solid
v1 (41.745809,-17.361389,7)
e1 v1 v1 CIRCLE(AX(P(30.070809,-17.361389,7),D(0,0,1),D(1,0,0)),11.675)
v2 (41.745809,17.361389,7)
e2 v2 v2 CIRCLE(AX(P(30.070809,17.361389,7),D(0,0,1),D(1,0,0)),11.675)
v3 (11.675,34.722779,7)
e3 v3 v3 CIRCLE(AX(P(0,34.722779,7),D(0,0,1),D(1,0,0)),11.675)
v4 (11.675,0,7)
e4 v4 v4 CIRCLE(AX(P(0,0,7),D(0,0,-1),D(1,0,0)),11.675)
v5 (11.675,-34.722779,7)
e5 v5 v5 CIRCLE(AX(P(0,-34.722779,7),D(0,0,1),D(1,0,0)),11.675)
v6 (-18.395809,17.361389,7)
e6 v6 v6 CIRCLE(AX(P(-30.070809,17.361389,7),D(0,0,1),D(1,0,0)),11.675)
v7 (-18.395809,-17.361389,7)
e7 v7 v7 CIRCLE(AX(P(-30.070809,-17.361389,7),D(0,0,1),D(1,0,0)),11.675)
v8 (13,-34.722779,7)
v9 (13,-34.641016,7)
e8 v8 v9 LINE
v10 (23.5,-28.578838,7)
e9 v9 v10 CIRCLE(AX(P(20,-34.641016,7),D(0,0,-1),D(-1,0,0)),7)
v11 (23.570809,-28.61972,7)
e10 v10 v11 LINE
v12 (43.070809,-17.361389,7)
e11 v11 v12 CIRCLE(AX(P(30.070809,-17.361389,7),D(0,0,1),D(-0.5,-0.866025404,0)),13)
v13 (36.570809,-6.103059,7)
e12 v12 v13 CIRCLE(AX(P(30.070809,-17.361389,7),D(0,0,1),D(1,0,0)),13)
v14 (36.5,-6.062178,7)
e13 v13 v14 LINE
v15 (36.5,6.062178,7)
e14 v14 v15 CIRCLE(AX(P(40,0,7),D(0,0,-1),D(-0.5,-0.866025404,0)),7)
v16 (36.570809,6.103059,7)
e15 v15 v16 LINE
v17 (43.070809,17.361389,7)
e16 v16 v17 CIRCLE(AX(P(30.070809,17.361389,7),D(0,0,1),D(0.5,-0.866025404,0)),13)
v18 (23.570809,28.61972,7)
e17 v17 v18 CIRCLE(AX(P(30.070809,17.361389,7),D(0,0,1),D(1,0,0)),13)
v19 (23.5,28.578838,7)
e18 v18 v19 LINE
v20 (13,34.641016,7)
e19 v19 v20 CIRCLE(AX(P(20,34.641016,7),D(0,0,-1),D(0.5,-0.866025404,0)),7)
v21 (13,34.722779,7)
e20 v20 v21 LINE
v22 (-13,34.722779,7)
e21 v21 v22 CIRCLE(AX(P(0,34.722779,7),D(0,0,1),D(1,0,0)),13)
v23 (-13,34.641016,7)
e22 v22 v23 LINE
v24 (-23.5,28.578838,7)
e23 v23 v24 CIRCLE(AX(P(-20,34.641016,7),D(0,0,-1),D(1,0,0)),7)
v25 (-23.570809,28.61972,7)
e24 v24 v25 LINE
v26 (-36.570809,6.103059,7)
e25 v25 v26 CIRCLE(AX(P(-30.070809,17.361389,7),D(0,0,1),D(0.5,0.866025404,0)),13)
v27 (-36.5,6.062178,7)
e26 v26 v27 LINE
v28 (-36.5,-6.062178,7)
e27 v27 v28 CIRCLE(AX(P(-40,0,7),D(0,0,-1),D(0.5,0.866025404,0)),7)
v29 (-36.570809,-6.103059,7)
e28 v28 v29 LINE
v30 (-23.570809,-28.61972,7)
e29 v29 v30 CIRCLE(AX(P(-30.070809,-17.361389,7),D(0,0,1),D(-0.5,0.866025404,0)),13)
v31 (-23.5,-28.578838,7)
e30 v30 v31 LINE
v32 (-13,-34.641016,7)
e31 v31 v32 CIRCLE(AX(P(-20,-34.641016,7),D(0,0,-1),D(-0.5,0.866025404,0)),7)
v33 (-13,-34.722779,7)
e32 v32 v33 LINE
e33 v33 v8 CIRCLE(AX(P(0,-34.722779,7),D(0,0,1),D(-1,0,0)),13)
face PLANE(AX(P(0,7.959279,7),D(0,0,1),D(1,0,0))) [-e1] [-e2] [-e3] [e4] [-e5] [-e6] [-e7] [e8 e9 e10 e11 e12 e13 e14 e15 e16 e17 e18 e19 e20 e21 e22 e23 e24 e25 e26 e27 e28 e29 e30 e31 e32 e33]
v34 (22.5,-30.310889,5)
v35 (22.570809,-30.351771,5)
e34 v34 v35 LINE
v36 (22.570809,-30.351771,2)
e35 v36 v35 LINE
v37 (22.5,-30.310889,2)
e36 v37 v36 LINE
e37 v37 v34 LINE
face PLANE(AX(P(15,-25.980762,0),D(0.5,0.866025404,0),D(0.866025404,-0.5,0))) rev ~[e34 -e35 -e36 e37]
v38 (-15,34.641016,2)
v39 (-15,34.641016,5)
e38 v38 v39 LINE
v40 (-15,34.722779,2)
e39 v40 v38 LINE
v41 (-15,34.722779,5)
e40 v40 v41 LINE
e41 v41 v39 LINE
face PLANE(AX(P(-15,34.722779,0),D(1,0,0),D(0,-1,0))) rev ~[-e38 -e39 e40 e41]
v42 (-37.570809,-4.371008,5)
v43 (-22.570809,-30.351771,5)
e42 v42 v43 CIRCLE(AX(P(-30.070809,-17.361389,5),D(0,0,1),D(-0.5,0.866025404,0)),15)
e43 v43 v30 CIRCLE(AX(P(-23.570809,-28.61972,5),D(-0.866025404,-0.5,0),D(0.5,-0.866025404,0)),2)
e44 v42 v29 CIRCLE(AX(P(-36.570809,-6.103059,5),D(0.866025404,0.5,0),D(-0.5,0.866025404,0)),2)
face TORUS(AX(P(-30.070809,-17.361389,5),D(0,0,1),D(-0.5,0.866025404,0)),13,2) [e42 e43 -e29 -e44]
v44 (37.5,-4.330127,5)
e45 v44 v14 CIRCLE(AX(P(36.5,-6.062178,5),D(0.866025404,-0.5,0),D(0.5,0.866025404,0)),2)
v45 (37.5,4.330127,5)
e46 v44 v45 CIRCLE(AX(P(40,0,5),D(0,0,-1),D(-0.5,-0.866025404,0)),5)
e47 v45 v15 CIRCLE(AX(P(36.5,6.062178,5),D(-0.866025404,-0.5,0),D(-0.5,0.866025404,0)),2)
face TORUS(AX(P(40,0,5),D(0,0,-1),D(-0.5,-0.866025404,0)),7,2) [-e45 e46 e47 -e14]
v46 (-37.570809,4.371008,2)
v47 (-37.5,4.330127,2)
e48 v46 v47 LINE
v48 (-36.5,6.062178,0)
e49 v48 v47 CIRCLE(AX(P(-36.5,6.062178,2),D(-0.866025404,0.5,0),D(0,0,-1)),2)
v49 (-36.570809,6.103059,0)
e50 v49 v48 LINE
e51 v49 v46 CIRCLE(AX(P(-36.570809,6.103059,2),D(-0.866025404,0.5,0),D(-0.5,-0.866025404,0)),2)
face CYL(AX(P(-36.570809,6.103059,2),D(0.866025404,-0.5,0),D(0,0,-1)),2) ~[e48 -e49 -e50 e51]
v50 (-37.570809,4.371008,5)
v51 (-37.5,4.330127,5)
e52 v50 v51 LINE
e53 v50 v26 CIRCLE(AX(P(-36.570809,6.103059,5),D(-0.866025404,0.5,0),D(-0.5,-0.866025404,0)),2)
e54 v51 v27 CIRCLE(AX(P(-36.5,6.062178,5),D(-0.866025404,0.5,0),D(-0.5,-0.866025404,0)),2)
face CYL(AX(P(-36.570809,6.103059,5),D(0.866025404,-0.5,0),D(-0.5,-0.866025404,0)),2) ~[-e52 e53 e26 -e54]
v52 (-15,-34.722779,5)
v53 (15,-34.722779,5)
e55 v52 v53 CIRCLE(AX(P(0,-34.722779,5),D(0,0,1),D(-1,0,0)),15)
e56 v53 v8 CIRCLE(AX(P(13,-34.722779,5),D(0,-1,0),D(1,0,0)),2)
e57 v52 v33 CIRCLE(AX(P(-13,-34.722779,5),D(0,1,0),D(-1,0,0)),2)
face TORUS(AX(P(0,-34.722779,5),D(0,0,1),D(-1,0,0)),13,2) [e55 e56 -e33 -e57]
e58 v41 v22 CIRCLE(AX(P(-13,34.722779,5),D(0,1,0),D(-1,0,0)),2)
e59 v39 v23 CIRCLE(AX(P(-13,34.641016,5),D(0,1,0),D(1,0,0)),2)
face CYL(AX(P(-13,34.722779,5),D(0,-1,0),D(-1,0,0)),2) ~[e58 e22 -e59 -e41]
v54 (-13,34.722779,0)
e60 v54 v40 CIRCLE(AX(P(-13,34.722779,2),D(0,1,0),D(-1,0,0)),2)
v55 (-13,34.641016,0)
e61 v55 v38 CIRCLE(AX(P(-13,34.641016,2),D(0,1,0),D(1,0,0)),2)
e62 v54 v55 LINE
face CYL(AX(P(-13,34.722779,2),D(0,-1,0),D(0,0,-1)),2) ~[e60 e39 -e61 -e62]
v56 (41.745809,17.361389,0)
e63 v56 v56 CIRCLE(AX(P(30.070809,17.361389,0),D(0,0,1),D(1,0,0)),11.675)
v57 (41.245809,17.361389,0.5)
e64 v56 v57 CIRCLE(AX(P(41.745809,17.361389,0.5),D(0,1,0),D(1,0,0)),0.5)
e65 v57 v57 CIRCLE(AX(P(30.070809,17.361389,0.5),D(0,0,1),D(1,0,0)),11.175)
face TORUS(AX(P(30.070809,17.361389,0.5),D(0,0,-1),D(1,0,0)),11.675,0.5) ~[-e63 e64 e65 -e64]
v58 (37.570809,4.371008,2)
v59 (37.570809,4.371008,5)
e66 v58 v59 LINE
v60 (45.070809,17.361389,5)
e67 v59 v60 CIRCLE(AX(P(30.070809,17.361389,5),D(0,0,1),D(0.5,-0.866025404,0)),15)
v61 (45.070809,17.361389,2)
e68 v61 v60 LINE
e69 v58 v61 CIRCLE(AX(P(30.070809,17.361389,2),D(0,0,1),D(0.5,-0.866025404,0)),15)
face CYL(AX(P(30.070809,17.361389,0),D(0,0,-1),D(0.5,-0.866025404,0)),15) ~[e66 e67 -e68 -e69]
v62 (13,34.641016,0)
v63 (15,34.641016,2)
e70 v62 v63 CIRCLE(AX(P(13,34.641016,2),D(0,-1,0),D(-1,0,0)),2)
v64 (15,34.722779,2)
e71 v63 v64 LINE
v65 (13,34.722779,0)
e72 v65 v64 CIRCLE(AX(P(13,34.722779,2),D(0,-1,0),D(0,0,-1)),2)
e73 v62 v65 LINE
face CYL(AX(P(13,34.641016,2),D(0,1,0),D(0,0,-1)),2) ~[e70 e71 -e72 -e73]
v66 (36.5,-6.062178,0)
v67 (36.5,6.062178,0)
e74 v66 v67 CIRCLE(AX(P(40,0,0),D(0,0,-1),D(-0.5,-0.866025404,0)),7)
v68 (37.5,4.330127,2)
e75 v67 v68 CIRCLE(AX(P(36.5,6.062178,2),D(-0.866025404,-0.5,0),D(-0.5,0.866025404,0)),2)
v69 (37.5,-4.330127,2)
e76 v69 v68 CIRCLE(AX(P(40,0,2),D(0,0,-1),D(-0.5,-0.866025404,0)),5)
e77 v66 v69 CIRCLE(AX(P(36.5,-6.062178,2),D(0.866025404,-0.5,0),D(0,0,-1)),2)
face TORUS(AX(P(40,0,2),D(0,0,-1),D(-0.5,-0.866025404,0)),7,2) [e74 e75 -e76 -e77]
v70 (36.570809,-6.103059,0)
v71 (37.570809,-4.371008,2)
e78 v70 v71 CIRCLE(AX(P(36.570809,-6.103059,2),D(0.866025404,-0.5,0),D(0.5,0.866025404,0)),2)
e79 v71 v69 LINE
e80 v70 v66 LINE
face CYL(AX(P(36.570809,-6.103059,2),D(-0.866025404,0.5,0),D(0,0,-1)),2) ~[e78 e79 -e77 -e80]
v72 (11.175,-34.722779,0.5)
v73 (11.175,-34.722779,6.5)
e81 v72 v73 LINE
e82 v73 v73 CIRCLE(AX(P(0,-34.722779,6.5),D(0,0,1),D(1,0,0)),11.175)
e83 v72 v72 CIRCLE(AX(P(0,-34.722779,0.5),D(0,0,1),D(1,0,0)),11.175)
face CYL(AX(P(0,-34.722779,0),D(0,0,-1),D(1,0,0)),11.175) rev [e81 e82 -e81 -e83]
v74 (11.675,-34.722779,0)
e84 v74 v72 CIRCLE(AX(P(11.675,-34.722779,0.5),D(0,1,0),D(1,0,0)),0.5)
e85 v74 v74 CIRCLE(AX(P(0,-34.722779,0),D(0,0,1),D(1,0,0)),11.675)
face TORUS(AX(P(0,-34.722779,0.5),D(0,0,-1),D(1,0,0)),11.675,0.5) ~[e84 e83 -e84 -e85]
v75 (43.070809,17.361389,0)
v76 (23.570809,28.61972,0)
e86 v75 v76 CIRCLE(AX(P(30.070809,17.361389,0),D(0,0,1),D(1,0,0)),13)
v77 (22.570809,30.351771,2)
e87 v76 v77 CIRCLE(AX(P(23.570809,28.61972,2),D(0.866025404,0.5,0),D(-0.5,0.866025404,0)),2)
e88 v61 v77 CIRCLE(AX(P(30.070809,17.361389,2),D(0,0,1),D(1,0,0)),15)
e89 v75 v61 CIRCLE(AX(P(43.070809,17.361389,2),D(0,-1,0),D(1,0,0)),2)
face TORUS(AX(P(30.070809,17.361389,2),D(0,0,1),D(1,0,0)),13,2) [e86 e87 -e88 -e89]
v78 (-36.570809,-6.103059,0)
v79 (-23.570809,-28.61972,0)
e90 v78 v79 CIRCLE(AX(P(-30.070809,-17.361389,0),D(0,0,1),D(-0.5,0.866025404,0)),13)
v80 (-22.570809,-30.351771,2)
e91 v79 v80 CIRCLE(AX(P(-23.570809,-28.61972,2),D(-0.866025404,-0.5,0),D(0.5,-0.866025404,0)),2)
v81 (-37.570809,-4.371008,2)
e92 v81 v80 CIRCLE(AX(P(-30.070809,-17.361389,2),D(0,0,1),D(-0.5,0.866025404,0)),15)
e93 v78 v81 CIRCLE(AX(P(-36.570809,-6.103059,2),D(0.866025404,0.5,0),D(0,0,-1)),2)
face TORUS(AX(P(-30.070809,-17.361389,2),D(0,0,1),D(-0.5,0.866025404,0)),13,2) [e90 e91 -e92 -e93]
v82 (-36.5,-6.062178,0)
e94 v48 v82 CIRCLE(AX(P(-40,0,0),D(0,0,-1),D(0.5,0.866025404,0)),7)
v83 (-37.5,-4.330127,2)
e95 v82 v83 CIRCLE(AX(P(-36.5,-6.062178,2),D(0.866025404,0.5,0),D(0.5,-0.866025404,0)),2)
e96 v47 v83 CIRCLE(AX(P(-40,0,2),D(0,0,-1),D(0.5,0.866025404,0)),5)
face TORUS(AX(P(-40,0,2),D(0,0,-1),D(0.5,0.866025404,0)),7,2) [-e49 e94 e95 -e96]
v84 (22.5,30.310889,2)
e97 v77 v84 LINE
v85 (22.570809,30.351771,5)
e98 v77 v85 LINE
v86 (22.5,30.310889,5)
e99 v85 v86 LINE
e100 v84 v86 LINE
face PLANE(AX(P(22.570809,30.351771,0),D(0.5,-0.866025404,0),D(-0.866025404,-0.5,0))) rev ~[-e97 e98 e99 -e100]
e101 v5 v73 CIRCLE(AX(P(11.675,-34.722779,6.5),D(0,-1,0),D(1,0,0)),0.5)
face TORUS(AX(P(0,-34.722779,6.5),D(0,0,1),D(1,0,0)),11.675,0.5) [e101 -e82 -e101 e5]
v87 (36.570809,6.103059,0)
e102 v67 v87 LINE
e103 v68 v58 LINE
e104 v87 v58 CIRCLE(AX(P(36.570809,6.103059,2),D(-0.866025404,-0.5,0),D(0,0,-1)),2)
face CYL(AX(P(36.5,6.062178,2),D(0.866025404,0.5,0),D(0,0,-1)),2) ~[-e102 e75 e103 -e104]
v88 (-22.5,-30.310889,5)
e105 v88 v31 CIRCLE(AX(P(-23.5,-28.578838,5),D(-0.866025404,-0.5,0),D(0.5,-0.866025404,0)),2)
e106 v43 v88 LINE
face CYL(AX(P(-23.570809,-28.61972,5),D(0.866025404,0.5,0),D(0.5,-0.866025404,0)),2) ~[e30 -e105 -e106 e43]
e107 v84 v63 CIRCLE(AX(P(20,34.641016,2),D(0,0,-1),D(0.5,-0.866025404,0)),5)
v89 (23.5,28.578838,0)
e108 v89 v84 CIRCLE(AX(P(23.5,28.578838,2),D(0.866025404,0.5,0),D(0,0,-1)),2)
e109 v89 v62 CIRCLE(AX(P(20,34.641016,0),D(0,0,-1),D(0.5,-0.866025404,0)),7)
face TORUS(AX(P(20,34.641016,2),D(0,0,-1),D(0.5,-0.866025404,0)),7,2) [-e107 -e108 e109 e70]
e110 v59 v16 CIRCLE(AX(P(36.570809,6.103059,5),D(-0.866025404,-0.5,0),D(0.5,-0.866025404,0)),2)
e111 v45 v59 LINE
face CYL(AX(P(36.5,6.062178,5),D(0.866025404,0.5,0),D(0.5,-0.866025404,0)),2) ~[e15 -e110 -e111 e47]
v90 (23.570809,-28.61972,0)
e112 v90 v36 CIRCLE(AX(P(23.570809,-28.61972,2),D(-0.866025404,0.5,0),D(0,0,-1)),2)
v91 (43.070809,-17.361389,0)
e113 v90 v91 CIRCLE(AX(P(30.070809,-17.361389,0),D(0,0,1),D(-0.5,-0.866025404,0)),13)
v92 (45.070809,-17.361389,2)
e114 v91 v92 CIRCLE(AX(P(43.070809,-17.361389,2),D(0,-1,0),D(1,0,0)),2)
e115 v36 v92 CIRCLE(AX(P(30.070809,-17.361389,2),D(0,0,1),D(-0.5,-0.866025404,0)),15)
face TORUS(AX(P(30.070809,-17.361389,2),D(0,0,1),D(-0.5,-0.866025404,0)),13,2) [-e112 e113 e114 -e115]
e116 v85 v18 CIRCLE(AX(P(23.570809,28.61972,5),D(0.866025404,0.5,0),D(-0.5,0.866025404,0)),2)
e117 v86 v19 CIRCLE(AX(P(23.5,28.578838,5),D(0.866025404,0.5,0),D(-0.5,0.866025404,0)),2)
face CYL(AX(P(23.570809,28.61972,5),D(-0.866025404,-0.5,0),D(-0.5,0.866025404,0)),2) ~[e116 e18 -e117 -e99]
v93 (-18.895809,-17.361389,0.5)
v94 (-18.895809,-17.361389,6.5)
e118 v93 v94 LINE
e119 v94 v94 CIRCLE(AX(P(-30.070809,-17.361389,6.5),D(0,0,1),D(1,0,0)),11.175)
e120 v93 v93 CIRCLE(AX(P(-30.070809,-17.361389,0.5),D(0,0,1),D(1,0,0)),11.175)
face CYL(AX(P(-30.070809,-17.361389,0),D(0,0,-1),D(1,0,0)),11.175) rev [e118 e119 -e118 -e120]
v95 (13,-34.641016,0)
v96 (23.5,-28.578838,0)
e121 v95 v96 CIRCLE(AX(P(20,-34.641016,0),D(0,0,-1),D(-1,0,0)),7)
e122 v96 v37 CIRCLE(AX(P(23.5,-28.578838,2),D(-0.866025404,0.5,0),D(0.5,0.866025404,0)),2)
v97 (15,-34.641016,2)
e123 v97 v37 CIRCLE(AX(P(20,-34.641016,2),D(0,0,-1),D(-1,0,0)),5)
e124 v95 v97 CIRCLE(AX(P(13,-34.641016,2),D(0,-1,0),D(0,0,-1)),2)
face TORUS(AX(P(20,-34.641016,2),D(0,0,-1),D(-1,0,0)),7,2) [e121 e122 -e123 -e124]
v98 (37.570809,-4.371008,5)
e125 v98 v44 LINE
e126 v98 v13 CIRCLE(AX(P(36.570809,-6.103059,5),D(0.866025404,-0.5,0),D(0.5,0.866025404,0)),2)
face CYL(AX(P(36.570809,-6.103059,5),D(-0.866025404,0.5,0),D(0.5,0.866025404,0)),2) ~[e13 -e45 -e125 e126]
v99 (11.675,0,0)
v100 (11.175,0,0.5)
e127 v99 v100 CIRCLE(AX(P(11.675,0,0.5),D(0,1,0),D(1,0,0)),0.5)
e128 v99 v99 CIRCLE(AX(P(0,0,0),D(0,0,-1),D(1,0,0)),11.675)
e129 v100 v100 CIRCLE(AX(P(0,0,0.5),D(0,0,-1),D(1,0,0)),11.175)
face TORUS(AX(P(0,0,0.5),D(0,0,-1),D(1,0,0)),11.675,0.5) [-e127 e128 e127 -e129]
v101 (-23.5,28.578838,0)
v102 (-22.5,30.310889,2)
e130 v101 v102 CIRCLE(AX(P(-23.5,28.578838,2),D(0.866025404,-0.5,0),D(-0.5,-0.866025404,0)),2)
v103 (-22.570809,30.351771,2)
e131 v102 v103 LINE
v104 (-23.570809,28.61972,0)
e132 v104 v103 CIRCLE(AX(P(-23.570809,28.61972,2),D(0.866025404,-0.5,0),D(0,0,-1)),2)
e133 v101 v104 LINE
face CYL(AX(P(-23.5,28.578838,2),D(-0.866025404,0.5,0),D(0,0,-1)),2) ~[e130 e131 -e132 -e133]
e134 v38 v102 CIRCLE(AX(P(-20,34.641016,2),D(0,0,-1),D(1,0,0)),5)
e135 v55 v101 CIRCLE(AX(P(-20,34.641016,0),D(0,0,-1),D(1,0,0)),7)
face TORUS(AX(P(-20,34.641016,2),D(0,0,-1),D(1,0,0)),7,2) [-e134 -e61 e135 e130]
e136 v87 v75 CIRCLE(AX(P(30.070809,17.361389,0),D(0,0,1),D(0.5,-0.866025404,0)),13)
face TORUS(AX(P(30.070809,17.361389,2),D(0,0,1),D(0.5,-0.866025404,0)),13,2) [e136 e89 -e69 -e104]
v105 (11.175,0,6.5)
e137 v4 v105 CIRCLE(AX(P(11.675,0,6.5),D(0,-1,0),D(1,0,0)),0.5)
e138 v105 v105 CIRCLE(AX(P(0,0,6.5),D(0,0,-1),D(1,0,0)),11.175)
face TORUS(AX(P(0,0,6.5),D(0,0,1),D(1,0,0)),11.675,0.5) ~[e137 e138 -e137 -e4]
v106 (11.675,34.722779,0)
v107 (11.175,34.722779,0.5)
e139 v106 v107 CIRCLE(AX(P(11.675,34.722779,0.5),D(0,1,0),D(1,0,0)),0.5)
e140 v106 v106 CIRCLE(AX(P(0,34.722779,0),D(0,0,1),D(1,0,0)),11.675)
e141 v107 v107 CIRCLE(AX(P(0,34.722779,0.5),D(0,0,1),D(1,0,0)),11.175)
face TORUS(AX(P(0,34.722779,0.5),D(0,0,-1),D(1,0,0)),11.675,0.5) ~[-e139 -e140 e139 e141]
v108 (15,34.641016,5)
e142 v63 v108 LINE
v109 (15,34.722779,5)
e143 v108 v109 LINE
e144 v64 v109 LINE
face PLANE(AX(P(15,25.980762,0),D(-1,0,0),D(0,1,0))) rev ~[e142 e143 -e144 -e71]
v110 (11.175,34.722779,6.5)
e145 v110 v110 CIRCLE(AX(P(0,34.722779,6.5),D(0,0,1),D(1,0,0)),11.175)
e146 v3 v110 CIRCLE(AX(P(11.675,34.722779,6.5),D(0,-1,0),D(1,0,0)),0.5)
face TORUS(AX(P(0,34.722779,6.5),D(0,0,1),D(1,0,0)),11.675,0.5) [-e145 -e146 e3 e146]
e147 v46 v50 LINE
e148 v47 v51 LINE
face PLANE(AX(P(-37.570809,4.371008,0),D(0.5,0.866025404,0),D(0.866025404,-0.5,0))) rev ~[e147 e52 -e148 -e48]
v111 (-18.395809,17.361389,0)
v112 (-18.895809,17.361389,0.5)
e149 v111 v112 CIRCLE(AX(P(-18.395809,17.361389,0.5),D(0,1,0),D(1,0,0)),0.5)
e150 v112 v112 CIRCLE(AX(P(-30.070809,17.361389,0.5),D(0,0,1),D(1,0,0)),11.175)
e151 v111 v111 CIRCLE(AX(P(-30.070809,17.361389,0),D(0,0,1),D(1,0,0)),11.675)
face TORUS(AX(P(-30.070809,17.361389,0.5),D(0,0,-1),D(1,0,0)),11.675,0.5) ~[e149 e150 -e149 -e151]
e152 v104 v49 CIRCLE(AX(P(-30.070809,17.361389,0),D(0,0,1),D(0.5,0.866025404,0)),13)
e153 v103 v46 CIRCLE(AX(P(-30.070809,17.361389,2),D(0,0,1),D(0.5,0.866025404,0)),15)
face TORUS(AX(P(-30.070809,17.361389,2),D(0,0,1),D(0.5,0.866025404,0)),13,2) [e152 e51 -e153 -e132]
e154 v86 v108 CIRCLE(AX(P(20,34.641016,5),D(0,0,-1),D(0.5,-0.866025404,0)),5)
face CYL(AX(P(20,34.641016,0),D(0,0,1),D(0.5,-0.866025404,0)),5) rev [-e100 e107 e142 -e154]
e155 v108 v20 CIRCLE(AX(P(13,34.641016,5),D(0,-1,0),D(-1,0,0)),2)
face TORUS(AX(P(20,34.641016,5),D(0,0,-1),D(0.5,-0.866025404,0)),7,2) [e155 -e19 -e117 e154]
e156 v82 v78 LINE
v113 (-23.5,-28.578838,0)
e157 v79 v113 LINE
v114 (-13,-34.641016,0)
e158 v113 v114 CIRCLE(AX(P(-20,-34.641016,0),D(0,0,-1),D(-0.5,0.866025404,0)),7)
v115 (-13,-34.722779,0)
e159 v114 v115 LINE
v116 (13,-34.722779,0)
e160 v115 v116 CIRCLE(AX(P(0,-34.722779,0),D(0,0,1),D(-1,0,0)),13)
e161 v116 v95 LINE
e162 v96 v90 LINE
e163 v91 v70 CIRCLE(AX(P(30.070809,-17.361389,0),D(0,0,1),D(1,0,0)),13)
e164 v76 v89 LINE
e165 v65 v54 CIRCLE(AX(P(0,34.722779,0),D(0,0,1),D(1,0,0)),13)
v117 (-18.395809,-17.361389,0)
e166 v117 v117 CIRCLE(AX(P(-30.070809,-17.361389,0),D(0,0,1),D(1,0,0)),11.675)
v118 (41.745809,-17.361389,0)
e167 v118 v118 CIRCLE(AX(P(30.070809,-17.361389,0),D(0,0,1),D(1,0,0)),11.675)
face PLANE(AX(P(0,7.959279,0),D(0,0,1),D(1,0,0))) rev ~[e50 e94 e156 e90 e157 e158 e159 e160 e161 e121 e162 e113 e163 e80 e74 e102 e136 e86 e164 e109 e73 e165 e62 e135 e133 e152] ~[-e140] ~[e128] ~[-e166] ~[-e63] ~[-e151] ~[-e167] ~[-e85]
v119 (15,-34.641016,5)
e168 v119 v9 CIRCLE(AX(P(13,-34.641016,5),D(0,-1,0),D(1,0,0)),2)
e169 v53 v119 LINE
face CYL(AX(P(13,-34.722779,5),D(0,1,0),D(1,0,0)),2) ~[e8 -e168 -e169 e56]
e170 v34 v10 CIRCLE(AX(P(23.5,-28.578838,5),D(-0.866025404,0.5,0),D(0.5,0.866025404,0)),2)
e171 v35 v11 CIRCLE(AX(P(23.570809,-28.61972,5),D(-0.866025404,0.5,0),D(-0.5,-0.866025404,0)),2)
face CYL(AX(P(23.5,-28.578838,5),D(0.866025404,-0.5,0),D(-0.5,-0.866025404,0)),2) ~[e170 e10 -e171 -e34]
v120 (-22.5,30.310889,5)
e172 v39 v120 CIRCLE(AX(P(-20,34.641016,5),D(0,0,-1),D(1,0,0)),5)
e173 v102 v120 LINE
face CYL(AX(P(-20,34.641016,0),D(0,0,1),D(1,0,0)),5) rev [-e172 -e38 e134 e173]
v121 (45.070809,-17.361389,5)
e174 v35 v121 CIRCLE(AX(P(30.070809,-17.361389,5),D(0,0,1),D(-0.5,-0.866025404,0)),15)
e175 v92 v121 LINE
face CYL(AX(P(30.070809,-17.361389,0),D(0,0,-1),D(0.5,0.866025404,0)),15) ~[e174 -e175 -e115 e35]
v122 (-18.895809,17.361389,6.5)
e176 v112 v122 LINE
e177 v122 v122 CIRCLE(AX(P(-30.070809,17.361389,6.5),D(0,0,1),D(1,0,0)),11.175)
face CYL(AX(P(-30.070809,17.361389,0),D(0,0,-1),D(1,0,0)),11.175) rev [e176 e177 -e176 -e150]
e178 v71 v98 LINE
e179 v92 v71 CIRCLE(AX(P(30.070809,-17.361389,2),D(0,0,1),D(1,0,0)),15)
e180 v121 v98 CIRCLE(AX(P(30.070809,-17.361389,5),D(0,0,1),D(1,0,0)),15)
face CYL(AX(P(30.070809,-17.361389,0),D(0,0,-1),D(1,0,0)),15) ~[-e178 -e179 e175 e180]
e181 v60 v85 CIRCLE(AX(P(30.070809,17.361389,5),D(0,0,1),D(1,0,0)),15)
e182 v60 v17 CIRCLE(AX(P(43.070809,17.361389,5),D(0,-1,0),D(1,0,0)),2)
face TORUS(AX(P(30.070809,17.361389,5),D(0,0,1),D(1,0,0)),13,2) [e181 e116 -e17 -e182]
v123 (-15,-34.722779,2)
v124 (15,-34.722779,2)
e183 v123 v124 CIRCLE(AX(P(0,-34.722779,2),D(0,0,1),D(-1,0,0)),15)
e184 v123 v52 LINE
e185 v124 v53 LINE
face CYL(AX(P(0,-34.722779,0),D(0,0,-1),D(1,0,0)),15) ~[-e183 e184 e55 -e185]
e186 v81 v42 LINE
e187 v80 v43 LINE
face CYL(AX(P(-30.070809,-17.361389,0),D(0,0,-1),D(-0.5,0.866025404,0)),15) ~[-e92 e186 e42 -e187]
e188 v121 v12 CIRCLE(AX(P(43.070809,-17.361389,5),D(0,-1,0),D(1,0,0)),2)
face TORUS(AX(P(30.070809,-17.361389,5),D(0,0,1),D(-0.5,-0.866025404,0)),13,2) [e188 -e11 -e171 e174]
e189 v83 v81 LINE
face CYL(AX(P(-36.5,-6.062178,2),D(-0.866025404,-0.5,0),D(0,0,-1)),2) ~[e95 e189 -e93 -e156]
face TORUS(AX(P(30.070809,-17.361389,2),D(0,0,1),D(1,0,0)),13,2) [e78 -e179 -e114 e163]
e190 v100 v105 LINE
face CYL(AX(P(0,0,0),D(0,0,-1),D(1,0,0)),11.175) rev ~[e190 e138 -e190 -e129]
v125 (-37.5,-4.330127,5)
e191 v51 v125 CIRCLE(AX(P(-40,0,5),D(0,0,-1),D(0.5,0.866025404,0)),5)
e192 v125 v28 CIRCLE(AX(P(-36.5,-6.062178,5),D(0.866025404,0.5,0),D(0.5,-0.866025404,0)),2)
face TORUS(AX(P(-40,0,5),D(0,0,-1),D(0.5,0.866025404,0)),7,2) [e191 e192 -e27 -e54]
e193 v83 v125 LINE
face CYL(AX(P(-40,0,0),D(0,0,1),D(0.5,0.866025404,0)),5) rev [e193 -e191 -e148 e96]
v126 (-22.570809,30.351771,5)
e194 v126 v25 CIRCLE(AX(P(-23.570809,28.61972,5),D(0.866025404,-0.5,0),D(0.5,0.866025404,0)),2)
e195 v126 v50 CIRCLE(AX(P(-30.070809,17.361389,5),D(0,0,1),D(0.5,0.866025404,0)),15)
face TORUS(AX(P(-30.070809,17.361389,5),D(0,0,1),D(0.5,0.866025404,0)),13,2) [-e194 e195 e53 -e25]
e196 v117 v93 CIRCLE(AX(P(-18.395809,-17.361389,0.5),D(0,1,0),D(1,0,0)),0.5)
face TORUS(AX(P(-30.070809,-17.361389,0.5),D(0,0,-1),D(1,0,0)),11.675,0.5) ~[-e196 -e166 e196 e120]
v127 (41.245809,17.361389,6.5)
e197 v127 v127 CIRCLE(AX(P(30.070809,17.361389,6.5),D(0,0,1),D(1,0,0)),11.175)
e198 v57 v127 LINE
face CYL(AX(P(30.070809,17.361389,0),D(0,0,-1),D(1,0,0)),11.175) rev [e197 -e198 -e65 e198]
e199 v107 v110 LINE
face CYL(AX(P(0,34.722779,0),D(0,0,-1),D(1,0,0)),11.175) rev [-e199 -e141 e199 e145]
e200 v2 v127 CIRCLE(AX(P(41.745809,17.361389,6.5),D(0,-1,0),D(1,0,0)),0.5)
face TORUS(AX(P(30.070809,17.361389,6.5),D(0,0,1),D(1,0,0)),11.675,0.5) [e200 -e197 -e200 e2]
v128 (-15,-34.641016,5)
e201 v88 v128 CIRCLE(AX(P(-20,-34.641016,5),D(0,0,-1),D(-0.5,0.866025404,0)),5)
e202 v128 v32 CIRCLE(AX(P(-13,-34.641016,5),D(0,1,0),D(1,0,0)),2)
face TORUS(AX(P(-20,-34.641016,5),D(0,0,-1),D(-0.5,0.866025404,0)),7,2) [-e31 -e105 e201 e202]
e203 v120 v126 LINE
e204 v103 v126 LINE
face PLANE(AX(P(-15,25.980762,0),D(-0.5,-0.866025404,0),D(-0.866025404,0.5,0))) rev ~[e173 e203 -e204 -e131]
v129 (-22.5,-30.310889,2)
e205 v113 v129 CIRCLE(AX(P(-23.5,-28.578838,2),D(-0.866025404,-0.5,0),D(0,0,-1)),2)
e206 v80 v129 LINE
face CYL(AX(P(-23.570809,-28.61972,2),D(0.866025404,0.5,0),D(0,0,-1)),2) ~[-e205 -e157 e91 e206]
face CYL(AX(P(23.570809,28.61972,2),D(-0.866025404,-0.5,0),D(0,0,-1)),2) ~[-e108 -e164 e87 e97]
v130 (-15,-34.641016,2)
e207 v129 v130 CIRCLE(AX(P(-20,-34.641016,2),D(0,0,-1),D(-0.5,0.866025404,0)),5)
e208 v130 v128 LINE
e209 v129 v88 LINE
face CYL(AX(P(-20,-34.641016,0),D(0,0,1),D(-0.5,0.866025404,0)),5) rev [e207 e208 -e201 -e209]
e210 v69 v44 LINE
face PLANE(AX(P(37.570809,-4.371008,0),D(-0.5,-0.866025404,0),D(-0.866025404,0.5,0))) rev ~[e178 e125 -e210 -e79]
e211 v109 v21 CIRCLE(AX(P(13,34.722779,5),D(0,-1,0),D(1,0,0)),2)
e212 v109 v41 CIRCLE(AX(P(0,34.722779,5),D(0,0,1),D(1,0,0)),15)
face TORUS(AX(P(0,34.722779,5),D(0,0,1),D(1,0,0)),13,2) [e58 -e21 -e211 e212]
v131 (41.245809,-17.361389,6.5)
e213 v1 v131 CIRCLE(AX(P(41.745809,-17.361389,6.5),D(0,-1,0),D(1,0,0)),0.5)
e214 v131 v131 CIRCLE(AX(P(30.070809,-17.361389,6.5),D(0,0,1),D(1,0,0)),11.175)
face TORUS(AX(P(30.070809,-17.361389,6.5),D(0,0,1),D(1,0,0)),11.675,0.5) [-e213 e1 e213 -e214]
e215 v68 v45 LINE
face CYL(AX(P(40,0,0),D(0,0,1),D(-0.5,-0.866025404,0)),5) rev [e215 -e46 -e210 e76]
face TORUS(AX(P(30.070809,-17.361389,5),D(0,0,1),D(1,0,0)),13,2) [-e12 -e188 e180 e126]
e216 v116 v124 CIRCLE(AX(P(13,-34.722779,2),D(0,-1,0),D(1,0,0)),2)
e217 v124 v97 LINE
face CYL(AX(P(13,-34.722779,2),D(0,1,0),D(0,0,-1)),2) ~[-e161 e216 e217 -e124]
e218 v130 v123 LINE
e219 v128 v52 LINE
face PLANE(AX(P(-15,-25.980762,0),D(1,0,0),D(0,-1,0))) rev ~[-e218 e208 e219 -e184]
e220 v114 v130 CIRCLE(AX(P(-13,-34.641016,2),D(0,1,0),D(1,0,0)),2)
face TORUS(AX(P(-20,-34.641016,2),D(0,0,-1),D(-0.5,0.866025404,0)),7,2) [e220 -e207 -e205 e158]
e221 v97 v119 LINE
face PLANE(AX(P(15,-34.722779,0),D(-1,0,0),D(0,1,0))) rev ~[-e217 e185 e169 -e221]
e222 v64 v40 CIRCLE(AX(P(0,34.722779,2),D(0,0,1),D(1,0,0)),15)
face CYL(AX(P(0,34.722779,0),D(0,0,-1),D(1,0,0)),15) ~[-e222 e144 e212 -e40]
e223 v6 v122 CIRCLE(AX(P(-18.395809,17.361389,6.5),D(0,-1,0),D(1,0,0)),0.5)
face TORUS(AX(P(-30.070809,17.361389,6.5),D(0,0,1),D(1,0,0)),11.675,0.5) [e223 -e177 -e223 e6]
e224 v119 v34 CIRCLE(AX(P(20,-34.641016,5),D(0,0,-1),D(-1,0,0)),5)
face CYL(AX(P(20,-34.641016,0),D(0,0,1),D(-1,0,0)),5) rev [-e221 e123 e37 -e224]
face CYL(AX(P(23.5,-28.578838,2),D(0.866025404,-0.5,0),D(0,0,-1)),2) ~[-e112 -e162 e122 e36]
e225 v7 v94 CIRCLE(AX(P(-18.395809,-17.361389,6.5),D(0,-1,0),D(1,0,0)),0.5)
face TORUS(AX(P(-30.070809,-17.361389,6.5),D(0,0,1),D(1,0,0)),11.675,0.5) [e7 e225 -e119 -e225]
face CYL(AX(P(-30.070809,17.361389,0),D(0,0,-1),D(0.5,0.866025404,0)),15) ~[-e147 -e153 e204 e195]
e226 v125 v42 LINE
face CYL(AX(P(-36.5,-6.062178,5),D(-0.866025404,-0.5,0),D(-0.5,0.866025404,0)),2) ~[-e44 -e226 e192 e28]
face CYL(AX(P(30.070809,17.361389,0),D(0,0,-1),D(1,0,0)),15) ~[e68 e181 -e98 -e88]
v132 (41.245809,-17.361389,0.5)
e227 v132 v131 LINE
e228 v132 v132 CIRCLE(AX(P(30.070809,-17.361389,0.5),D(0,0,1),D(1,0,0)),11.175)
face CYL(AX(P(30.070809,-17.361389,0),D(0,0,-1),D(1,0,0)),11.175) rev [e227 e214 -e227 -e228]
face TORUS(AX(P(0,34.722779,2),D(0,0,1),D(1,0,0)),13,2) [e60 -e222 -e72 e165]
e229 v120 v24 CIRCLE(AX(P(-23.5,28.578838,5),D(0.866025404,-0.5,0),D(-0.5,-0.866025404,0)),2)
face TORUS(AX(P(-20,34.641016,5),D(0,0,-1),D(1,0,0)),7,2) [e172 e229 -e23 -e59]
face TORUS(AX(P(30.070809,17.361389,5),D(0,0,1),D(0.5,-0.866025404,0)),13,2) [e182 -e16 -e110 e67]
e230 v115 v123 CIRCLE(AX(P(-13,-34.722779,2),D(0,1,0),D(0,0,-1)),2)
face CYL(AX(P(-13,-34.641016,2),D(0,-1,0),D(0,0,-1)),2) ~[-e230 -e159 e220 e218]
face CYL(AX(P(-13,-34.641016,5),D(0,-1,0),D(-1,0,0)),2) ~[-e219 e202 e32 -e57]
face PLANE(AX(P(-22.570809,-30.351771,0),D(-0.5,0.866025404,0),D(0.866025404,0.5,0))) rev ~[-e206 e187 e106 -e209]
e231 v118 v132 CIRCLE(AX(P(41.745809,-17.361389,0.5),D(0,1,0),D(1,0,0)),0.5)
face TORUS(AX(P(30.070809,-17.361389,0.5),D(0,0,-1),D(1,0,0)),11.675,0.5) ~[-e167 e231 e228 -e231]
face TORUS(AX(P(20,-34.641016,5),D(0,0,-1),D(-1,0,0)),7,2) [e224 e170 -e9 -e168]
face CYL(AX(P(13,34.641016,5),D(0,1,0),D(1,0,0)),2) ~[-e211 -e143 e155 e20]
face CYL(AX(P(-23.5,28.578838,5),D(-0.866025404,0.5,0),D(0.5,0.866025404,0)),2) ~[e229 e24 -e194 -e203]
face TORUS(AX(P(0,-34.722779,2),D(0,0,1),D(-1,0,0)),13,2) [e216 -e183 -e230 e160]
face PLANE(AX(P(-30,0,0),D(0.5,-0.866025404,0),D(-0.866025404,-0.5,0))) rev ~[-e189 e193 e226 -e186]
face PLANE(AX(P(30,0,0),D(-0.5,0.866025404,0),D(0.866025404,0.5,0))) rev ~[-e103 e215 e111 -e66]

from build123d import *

# Parameters (mm, degrees)
F0_R     = 11.175
F1_DEPTH = 7
F2_R     = 5
F3_R     = 0.5
F4_R     = 2


# Not quite as in the source:
# - a feature names something its author has since deleted; it is built from what else it names


with BuildPart() as f1:
    # F0 (on Top) → F1 (new body)
    with BuildSketch(Plane.XY):
        with BuildLine():
            Line((15, 0), (15, 8.6602540378))
            Line((15, 8.6602540378), (7.5, 12.9903810568))
            Line((7.5, 12.9903810568), (0, 17.3205080757))
            Line((0, 17.3205080757), (-7.5, 12.9903810568))
            Line((-7.5, 12.9903810568), (-15, 8.6602540378))
            Line((-15, 8.6602540378), (-15, 0))
            Line((-15, 0), (-11.175, 0))
            ThreePointArc((-11.175, 0), (0, 11.175), (11.175, 0))
            Line((11.175, 0), (15, 0))
        make_face()
        with BuildLine():
            Line((15, 25.9807621135), (15, 34.7227789462))
            ThreePointArc((15, 34.7227789462), (0, 19.7227789462), (-15, 34.7227789462))
            Line((-15, 34.7227789462), (-15, 25.9807621135))
            Line((-15, 25.9807621135), (0, 17.3205080757))
            Line((0, 17.3205080757), (15, 25.9807621135))
        make_face()
        with BuildLine():
            ThreePointArc((-15, 34.7227789462), (0, 19.7227789462), (15, 34.7227789462))
            ThreePointArc((15, 34.7227789462), (0, 49.7227789462), (-15, 34.7227789462))
        make_face()
        with Locations((0, 34.7227789462)):
            Circle(F0_R, mode=Mode.SUBTRACT)
        with BuildLine():
            ThreePointArc((-15.0708086574, 17.3613894731), (-17.0804276006, 24.8613894731), (-22.5708086574, 30.3517705298))
            ThreePointArc((-22.5708086574, 30.3517705298), (-43.0611897141, 24.8613894731), (-37.5708086574, 4.3710084163))
            ThreePointArc((-37.5708086574, 4.3710084163), (-22.5708086574, 4.3710084163), (-15.0708086574, 17.3613894731))
        make_face()
        with Locations((-30.0708086574, 17.3613894731)):
            Circle(F0_R, mode=Mode.SUBTRACT)
        with BuildLine():
            ThreePointArc((-15, -34.7227789462), (0, -49.7227789462), (15, -34.7227789462))
            ThreePointArc((15, -34.7227789462), (0, -19.7227789462), (-15, -34.7227789462))
        make_face()
        with Locations((0, -34.7227789462)):
            Circle(F0_R, mode=Mode.SUBTRACT)
        with BuildLine():
            Line((15, -34.7227789462), (15, -25.9807621135))
            Line((15, -25.9807621135), (0, -17.3205080757))
            Line((0, -17.3205080757), (-15, -25.9807621135))
            Line((-15, -25.9807621135), (-15, -34.7227789462))
            ThreePointArc((-15, -34.7227789462), (0, -19.7227789462), (15, -34.7227789462))
        make_face()
        Polygon((30, 0), (15, 8.6602540378), (15, 0), (15, -8.6602540378), align=None)
        with BuildLine():
            ThreePointArc((-15.0708086574, -17.3613894731), (-22.5708086574, -4.3710084163), (-37.5708086574, -4.3710084163))
            ThreePointArc((-37.5708086574, -4.3710084163), (-43.0611897141, -24.8613894731), (-22.5708086574, -30.3517705298))
            ThreePointArc((-22.5708086574, -30.3517705298), (-17.0804276006, -24.8613894731), (-15.0708086574, -17.3613894731))
        make_face()
        with Locations((-30.0708086574, -17.3613894731)):
            Circle(F0_R, mode=Mode.SUBTRACT)
        with BuildLine():
            Line((-15, -8.6602540378), (-30, 0))
            Line((-30, 0), (-37.5708086574, -4.3710084163))
            ThreePointArc((-37.5708086574, -4.3710084163), (-22.5708086574, -4.3710084163), (-15.0708086574, -17.3613894731))
            ThreePointArc((-15.0708086574, -17.3613894731), (-17.0804276006, -24.8613894731), (-22.5708086574, -30.3517705298))
            Line((-22.5708086574, -30.3517705298), (-15, -25.9807621135))
            Line((-15, -25.9807621135), (-15, -8.6602540378))
        make_face()
        Polygon((-15, 0), (-15, 8.6602540378), (-30, 0), (-15, -8.6602540378), align=None)
        with BuildLine():
            Line((-15, 8.6602540378), (-15, 25.9807621135))
            Line((-15, 25.9807621135), (-22.5708086574, 30.3517705298))
            ThreePointArc((-22.5708086574, 30.3517705298), (-17.0804276006, 24.8613894731), (-15.0708086574, 17.3613894731))
            ThreePointArc((-15.0708086574, 17.3613894731), (-22.5708086574, 4.3710084163), (-37.5708086574, 4.3710084163))
            Line((-37.5708086574, 4.3710084163), (-30, 0))
            Line((-30, 0), (-15, 8.6602540378))
        make_face()
        Polygon((0, 17.3205080757), (-15, 25.9807621135), (-15, 8.6602540378), (-7.5, 12.9903810568), align=None)
        with BuildLine():
            Line((15, -8.6602540378), (15, 0))
            Line((15, 0), (11.175, 0))
            ThreePointArc((11.175, 0), (0, -11.175), (-11.175, 0))
            Line((-11.175, 0), (-15, 0))
            Line((-15, 0), (-15, -8.6602540378))
            Line((-15, -8.6602540378), (-7.5, -12.9903810568))
            Line((-7.5, -12.9903810568), (0, -17.3205080757))
            Line((0, -17.3205080757), (7.5, -12.9903810568))
            Line((7.5, -12.9903810568), (15, -8.6602540378))
        make_face()
        Polygon((15, 8.6602540378), (15, 25.9807621135), (0, 17.3205080757), (7.5, 12.9903810568), align=None)
        with BuildLine():
            Line((22.5708086574, 30.3517705298), (15, 25.9807621135))
            Line((15, 25.9807621135), (15, 8.6602540378))
            Line((15, 8.6602540378), (30, 0))
            Line((30, 0), (37.5708086574, 4.3710084163))
            ThreePointArc((37.5708086574, 4.3710084163), (17.0804276006, 9.8613894731), (22.5708086574, 30.3517705298))
        make_face()
        with BuildLine():
            ThreePointArc((45.0708086574, 17.3613894731), (37.5708086574, 30.3517705298), (22.5708086574, 30.3517705298))
            ThreePointArc((22.5708086574, 30.3517705298), (17.0804276006, 9.8613894731), (37.5708086574, 4.3710084163))
            ThreePointArc((37.5708086574, 4.3710084163), (43.0611897141, 9.8613894731), (45.0708086574, 17.3613894731))
        make_face()
        with Locations((30.0708086574, 17.3613894731)):
            Circle(F0_R, mode=Mode.SUBTRACT)
        with BuildLine():
            ThreePointArc((45.0708086574, -17.3613894731), (43.0611897141, -9.8613894731), (37.5708086574, -4.3710084163))
            ThreePointArc((37.5708086574, -4.3710084163), (17.0804276006, -9.8613894731), (22.5708086574, -30.3517705298))
            ThreePointArc((22.5708086574, -30.3517705298), (37.5708086574, -30.3517705298), (45.0708086574, -17.3613894731))
        make_face()
        with Locations((30.0708086574, -17.3613894731)):
            Circle(F0_R, mode=Mode.SUBTRACT)
        Polygon((15, -25.9807621135), (15, -8.6602540378), (7.5, -12.9903810568), (0, -17.3205080757), align=None)
        Polygon((-7.5, -12.9903810568), (-15, -8.6602540378), (-15, -25.9807621135), (0, -17.3205080757), align=None)
        with BuildLine():
            Line((37.5708086574, -4.3710084163), (30, 0))
            Line((30, 0), (15, -8.6602540378))
            Line((15, -8.6602540378), (15, -25.9807621135))
            Line((15, -25.9807621135), (22.5708086574, -30.3517705298))
            ThreePointArc((22.5708086574, -30.3517705298), (17.0804276006, -9.8613894731), (37.5708086574, -4.3710084163))
        make_face()
    extrude(amount=F1_DEPTH)

    # F2
    f2_edges = [f1.edges().sort_by_distance(p)[0] for p in [
        (-15, -25.980762, 3.5),
        (-30, 0, 3.5),
        (30, 0, 3.5),
        (15, -25.980762, 3.5),
        (15, 25.980762, 3.5),
        (-15, 25.980762, 3.5),
    ]]
    fillet(f2_edges, radius=F2_R)

    # F3
    f3_edges = [f1.edges().sort_by_distance(p)[0] for p in [
        (-11.175, 34.722779, 7),
        (-11.175, 0, 7),
        (-11.175, 34.722779, 0),
        (-11.175, 0, 0),
        (-41.245809, -17.361389, 7),
        (-41.245809, 17.361389, 0),
        (-11.175, -34.722779, 0),
        (-41.245809, -17.361389, 0),
        (-11.175, -34.722779, 7),
        (-41.245809, 17.361389, 7),
        (18.895809, 17.361389, 7),
        (18.895809, -17.361389, 7),
        (18.895809, 17.361389, 0),
        (18.895809, -17.361389, 0),
    ]]
    fillet(f3_edges, radius=F3_R)

    # F4
    f4_edges = [f1.edges().sort_by_distance(p)[0] for p in [
        (-17.5, 30.310889, 0),
        (-15, 34.641016, 3.5),
        (-22.5, 30.310889, 3.5),
        (-17.5, 30.310889, 7),
        (-15, 34.681898, 0),
        (-15, 34.722779, 3.5),
        (-15, 34.681898, 7),
        (15, 34.722779, 3.5),
        (0, 49.722779, 0),
        (0, 49.722779, 7),
        (15, 34.681898, 0),
        (15, 34.641016, 3.5),
        (15, 34.681898, 7),
        (17.5, 30.310889, 0),
        (22.5, 30.310889, 3.5),
        (17.5, 30.310889, 7),
        (-43.06119, -24.861389, 7),
        (-43.06119, -24.861389, 0),
        (-22.535404, -30.33133, 0),
        (-17.5, -30.310889, 0),
        (-15, -34.681898, 0),
        (-37.535404, -4.350568, 0),
        (0, -49.722779, 0),
        (-35, 0, 0),
        (15, -34.681898, 0),
        (-37.535404, 4.350568, 0),
        (17.5, -30.310889, 0),
        (-43.06119, 24.861389, 0),
        (22.535404, -30.33133, 0),
        (-22.535404, 30.33133, 0),
        (43.06119, -24.861389, 0),
        (37.535404, -4.350568, 0),
        (35, 0, 0),
        (37.535404, 4.350568, 0),
        (43.06119, 24.861389, 0),
        (22.535404, 30.33133, 0),
        (-22.535404, -30.33133, 7),
        (-17.5, -30.310889, 7),
        (-15, -34.681898, 7),
        (-37.535404, -4.350568, 7),
        (0, -49.722779, 7),
        (-35, 0, 7),
        (15, -34.681898, 7),
        (-37.535404, 4.350568, 7),
        (17.5, -30.310889, 7),
        (-43.06119, 24.861389, 7),
        (22.535404, -30.33133, 7),
        (-22.535404, 30.33133, 7),
        (43.06119, -24.861389, 7),
        (37.535404, -4.350568, 7),
        (35, 0, 7),
        (37.535404, 4.350568, 7),
        (43.06119, 24.861389, 7),
        (22.535404, 30.33133, 7),
    ]]
    fillet(f4_edges, radius=F4_R)


solid = f1.part
